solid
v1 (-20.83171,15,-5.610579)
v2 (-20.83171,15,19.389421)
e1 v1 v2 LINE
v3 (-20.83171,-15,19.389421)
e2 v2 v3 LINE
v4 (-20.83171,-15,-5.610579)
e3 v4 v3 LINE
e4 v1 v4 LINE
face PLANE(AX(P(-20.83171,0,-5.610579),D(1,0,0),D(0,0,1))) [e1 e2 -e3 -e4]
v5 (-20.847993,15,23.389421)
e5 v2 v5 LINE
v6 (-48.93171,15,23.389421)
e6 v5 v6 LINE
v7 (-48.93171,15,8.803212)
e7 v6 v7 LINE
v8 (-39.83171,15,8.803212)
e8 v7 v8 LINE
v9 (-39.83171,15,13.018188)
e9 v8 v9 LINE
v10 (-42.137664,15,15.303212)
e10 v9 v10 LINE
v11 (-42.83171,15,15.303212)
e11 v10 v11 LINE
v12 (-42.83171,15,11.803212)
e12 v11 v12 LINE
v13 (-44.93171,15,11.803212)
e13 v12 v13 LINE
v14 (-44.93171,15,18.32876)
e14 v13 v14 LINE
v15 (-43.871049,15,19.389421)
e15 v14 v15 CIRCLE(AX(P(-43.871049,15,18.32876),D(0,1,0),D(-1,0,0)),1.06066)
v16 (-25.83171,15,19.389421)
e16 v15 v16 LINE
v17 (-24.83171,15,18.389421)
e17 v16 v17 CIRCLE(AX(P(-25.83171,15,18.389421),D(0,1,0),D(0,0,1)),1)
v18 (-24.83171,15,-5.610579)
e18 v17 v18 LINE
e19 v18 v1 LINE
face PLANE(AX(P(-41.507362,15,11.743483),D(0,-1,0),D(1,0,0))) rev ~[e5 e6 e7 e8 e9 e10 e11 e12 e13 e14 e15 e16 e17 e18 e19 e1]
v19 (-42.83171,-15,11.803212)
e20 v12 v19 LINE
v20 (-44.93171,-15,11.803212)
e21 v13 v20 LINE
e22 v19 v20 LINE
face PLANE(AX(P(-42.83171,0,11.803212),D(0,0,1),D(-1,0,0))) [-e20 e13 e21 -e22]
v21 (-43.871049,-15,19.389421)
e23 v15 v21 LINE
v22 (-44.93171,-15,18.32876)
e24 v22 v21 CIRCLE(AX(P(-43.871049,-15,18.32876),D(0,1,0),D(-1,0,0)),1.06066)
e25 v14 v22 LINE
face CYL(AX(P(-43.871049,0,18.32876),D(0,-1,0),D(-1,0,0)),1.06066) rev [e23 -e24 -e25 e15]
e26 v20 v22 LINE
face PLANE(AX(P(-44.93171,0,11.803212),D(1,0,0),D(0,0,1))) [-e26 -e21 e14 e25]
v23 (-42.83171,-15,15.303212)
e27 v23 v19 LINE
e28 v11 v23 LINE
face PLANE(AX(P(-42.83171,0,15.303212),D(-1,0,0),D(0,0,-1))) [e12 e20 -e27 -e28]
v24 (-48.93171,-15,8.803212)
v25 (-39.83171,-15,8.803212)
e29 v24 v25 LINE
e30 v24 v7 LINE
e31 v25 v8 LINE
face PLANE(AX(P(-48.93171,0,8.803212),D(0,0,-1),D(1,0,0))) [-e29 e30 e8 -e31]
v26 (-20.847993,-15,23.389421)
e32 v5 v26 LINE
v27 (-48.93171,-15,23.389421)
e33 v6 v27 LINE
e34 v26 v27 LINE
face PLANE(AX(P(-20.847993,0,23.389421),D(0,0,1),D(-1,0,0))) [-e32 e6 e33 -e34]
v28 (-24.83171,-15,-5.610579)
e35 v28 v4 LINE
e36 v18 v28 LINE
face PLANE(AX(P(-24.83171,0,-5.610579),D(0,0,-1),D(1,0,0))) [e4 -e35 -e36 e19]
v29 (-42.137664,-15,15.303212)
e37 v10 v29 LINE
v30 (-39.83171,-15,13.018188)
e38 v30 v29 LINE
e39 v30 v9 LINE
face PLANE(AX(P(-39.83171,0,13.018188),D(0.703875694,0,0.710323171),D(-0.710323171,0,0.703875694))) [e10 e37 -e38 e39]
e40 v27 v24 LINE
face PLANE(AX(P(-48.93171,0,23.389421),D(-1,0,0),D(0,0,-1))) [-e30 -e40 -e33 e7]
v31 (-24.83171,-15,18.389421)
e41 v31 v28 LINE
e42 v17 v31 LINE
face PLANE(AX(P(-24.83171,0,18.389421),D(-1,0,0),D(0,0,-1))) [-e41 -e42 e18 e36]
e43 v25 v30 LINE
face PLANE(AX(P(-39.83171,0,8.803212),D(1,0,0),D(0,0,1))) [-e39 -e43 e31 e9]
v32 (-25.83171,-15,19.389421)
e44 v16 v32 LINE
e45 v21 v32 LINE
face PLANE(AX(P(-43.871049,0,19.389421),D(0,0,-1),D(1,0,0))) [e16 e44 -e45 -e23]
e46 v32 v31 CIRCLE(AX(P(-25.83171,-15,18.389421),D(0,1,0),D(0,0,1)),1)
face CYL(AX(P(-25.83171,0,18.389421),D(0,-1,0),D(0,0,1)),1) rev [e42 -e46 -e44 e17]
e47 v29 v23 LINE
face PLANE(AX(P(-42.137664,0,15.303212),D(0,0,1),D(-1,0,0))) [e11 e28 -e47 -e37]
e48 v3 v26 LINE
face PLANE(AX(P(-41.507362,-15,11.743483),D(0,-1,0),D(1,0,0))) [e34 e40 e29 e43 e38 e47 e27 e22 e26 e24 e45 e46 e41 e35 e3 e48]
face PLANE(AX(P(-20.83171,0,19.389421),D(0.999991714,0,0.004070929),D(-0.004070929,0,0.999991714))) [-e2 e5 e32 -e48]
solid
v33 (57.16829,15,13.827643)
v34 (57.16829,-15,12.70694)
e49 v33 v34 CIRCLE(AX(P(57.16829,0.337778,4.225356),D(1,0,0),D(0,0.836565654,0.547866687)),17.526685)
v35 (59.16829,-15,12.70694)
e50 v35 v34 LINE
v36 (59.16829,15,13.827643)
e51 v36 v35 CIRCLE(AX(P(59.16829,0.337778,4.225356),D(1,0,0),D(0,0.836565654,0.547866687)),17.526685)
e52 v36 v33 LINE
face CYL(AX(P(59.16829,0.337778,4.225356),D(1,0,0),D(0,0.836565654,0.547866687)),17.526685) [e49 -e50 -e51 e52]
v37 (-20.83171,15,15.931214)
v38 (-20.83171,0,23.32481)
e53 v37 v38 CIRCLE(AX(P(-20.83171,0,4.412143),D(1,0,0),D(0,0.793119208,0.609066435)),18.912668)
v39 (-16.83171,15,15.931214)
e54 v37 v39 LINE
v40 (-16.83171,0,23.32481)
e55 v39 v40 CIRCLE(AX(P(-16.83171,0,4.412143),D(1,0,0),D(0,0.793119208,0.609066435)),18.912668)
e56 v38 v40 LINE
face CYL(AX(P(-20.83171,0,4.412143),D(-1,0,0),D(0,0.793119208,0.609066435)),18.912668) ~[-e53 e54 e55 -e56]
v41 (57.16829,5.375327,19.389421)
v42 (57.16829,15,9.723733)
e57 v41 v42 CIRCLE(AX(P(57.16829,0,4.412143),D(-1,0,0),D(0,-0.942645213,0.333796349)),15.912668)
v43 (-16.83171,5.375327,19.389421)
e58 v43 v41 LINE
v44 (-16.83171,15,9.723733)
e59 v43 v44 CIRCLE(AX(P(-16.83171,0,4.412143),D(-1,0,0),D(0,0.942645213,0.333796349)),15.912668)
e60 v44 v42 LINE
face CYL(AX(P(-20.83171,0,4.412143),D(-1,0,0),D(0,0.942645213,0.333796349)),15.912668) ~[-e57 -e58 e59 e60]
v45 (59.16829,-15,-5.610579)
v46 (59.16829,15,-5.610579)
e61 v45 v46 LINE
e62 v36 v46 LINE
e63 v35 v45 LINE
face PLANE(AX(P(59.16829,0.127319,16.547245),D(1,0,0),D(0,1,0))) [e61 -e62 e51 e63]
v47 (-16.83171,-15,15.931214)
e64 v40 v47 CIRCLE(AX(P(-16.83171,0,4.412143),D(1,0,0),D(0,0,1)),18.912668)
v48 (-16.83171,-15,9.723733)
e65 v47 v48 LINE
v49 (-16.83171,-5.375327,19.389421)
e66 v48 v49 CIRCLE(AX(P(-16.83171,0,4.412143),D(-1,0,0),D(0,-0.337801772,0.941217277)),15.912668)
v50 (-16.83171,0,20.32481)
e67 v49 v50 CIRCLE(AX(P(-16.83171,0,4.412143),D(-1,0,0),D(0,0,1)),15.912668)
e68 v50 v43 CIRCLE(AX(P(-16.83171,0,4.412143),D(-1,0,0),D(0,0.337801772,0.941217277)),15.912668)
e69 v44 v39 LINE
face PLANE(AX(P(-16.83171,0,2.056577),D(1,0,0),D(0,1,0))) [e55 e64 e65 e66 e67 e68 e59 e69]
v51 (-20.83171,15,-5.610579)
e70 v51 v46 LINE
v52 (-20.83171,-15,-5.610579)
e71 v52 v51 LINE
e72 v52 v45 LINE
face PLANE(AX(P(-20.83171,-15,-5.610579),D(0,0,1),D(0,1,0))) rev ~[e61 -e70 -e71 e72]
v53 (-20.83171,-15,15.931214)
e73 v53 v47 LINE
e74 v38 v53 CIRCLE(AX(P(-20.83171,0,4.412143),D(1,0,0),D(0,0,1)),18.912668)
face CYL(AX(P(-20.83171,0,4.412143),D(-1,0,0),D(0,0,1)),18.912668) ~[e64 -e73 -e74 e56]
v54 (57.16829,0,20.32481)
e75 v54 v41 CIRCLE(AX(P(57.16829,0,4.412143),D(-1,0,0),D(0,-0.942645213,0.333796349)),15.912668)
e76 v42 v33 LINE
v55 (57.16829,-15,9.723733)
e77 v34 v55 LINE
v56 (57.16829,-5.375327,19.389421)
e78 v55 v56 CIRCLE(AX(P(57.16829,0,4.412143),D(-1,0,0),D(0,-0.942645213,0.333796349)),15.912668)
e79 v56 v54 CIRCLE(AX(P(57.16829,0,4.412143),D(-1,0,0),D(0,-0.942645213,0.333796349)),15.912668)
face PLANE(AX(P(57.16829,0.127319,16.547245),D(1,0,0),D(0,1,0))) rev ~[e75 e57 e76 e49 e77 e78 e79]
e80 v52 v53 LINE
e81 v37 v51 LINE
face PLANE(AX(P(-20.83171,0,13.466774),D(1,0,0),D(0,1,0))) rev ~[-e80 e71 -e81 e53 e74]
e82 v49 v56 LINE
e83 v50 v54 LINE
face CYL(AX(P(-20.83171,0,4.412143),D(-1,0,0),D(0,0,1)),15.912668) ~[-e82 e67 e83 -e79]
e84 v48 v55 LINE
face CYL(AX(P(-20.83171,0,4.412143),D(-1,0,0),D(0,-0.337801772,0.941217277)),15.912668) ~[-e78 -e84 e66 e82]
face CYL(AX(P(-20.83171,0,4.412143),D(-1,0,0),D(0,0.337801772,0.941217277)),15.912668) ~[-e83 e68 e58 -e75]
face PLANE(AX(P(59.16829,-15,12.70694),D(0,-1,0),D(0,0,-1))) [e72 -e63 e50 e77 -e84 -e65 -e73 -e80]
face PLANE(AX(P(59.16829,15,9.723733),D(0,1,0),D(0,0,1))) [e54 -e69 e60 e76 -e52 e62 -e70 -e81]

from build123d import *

# Parameters (mm, degrees)
F1_W     = 4
F1_H     = 20
F2_DEPTH = 15
F3_W     = 30
F3_H     = 15.3343126304
F4_DEPTH = 80
F5_DEPTH = 4
F7_DEPTH = 2


with BuildPart() as f2:
    # F1 (on face) → F2 (new body, symmetric)
    with BuildSketch(Plane.XZ):
        Polygon((-39.8317096115, 13.0181881455), (-42.1376643062, 15.303212098), (-42.8317096115, 15.303212098), (-42.8317096115, 11.803212098), (-42.8317096115, 8.803212098), (-39.8317096115, 8.803212098), align=None)
        Polygon((-42.8317096115, 8.803212098), (-42.8317096115, 11.803212098), (-44.9317096115, 11.803212098), (-48.9317096115, 11.803212098), (-48.9317096115, 8.803212098), align=None)
        with BuildLine():
            Line((-48.9317096115, 11.803212098), (-44.9317096115, 11.803212098))
            Line((-44.9317096115, 11.803212098), (-44.9317096115, 18.3287603771))
            ThreePointArc((-44.9317096115, 18.3287603771), (-44.6210494397, 19.0787603771), (-43.8710494397, 19.3894205489))
            Line((-43.8710494397, 19.3894205489), (-25.8317096115, 19.3894205489))
            ThreePointArc((-25.8317096115, 19.3894205489), (-25.1246028303, 19.0965273301), (-24.8317096115, 18.3894205489))
            Line((-24.8317096115, 18.3894205489), (-24.8317096115, 14.3894205489))
            Line((-24.8317096115, 14.3894205489), (-20.8317096115, 14.3894205489))
            Line((-20.8317096115, 14.3894205489), (-20.8317096115, 19.3894205489))
            Line((-20.8317096115, 19.3894205489), (-20.8479934643, 23.3894205489))
            Line((-20.8479934643, 23.3894205489), (-48.9317096115, 23.3894205489))
            Line((-48.9317096115, 23.3894205489), (-48.9317096115, 11.803212098))
        make_face()
        with Locations((-22.8317096115, 4.3894205489)):
            Rectangle(F1_W, F1_H)
    extrude(amount=F2_DEPTH, both=True)


with BuildPart() as f4:
    # F3 (on face) → F4 (new body)
    with BuildSketch(Plane.YZ.offset(-20.8317096115)):
        with BuildLine():
            ThreePointArc((-5.3753273285, 19.3894205489), (-11.2758533609, 15.6401490131), (-15, 9.7237331793))
            Line((-15, 9.7237331793), (15, 9.7237331793))
            ThreePointArc((15, 9.7237331793), (11.2758533609, 15.6401490131), (5.3753273285, 19.3894205489))
            Line((5.3753273285, 19.3894205489), (-5.3753273285, 19.3894205489))
        make_face()
        with Locations((0, 2.0565768641)):
            Rectangle(F3_W, F3_H)
        with BuildLine():
            ThreePointArc((0, 20.3248104797), (-2.7280532533, 20.0892189982), (-5.3753273285, 19.3894205489))
            Line((-5.3753273285, 19.3894205489), (5.3753273285, 19.3894205489))
            ThreePointArc((5.3753273285, 19.3894205489), (2.7280532533, 20.0892189982), (0, 20.3248104797))
        make_face()
    extrude(amount=F4_DEPTH)

    # F3 (on face) → F5 (join)
    with BuildSketch(Plane.YZ.offset(-20.8317096115)):
        with Locations((0, 2.0565768641)):
            Rectangle(F3_W, F3_H)
        with BuildLine():
            ThreePointArc((0, 20.3248104797), (-9.1839920504, 17.4070372825), (-15, 9.7237331793))
            Line((-15, 9.7237331793), (15, 9.7237331793))
            ThreePointArc((15, 9.7237331793), (9.1839920504, 17.4070372825), (0, 20.3248104797))
        make_face()
        with BuildLine():
            Line((-15, 13.3237317204), (-15, 9.7237331793))
            ThreePointArc((-15, 9.7237331793), (-9.1839920504, 17.4070372825), (0, 20.3248104797))
            ThreePointArc((0, 20.3248104797), (9.1839920504, 17.4070372825), (15, 9.7237331793))
            Line((15, 9.7237331793), (15, 13.3237317204))
            Line((15, 13.3237317204), (15, 15.9312138795))
            ThreePointArc((15, 15.9312138795), (8.3615977942, 21.376006777), (0, 23.3248104797))
            ThreePointArc((0, 23.3248104797), (-8.3615977942, 21.376006777), (-15, 15.9312138795))
            Line((-15, 15.9312138795), (-15, 13.3237317204))
        make_face()
    extrude(amount=F5_DEPTH)

    # F6 (on face) → F7 (join)
    with BuildSketch(Plane.YZ.offset(59.1682903885)):
        with BuildLine():
            Line((15, 9.7237331793), (15, 13.827643136))
            ThreePointArc((15, 13.827643136), (-0.3165064861, 21.7398244617), (-15, 12.7069399559))
            Line((-15, 12.7069399559), (-15, 9.7237331793))
            ThreePointArc((-15, 9.7237331793), (0, 20.3248104797), (15, 9.7237331793))
        make_face()
    extrude(amount=-F7_DEPTH)


solid = Compound([f2.part, f4.part])
